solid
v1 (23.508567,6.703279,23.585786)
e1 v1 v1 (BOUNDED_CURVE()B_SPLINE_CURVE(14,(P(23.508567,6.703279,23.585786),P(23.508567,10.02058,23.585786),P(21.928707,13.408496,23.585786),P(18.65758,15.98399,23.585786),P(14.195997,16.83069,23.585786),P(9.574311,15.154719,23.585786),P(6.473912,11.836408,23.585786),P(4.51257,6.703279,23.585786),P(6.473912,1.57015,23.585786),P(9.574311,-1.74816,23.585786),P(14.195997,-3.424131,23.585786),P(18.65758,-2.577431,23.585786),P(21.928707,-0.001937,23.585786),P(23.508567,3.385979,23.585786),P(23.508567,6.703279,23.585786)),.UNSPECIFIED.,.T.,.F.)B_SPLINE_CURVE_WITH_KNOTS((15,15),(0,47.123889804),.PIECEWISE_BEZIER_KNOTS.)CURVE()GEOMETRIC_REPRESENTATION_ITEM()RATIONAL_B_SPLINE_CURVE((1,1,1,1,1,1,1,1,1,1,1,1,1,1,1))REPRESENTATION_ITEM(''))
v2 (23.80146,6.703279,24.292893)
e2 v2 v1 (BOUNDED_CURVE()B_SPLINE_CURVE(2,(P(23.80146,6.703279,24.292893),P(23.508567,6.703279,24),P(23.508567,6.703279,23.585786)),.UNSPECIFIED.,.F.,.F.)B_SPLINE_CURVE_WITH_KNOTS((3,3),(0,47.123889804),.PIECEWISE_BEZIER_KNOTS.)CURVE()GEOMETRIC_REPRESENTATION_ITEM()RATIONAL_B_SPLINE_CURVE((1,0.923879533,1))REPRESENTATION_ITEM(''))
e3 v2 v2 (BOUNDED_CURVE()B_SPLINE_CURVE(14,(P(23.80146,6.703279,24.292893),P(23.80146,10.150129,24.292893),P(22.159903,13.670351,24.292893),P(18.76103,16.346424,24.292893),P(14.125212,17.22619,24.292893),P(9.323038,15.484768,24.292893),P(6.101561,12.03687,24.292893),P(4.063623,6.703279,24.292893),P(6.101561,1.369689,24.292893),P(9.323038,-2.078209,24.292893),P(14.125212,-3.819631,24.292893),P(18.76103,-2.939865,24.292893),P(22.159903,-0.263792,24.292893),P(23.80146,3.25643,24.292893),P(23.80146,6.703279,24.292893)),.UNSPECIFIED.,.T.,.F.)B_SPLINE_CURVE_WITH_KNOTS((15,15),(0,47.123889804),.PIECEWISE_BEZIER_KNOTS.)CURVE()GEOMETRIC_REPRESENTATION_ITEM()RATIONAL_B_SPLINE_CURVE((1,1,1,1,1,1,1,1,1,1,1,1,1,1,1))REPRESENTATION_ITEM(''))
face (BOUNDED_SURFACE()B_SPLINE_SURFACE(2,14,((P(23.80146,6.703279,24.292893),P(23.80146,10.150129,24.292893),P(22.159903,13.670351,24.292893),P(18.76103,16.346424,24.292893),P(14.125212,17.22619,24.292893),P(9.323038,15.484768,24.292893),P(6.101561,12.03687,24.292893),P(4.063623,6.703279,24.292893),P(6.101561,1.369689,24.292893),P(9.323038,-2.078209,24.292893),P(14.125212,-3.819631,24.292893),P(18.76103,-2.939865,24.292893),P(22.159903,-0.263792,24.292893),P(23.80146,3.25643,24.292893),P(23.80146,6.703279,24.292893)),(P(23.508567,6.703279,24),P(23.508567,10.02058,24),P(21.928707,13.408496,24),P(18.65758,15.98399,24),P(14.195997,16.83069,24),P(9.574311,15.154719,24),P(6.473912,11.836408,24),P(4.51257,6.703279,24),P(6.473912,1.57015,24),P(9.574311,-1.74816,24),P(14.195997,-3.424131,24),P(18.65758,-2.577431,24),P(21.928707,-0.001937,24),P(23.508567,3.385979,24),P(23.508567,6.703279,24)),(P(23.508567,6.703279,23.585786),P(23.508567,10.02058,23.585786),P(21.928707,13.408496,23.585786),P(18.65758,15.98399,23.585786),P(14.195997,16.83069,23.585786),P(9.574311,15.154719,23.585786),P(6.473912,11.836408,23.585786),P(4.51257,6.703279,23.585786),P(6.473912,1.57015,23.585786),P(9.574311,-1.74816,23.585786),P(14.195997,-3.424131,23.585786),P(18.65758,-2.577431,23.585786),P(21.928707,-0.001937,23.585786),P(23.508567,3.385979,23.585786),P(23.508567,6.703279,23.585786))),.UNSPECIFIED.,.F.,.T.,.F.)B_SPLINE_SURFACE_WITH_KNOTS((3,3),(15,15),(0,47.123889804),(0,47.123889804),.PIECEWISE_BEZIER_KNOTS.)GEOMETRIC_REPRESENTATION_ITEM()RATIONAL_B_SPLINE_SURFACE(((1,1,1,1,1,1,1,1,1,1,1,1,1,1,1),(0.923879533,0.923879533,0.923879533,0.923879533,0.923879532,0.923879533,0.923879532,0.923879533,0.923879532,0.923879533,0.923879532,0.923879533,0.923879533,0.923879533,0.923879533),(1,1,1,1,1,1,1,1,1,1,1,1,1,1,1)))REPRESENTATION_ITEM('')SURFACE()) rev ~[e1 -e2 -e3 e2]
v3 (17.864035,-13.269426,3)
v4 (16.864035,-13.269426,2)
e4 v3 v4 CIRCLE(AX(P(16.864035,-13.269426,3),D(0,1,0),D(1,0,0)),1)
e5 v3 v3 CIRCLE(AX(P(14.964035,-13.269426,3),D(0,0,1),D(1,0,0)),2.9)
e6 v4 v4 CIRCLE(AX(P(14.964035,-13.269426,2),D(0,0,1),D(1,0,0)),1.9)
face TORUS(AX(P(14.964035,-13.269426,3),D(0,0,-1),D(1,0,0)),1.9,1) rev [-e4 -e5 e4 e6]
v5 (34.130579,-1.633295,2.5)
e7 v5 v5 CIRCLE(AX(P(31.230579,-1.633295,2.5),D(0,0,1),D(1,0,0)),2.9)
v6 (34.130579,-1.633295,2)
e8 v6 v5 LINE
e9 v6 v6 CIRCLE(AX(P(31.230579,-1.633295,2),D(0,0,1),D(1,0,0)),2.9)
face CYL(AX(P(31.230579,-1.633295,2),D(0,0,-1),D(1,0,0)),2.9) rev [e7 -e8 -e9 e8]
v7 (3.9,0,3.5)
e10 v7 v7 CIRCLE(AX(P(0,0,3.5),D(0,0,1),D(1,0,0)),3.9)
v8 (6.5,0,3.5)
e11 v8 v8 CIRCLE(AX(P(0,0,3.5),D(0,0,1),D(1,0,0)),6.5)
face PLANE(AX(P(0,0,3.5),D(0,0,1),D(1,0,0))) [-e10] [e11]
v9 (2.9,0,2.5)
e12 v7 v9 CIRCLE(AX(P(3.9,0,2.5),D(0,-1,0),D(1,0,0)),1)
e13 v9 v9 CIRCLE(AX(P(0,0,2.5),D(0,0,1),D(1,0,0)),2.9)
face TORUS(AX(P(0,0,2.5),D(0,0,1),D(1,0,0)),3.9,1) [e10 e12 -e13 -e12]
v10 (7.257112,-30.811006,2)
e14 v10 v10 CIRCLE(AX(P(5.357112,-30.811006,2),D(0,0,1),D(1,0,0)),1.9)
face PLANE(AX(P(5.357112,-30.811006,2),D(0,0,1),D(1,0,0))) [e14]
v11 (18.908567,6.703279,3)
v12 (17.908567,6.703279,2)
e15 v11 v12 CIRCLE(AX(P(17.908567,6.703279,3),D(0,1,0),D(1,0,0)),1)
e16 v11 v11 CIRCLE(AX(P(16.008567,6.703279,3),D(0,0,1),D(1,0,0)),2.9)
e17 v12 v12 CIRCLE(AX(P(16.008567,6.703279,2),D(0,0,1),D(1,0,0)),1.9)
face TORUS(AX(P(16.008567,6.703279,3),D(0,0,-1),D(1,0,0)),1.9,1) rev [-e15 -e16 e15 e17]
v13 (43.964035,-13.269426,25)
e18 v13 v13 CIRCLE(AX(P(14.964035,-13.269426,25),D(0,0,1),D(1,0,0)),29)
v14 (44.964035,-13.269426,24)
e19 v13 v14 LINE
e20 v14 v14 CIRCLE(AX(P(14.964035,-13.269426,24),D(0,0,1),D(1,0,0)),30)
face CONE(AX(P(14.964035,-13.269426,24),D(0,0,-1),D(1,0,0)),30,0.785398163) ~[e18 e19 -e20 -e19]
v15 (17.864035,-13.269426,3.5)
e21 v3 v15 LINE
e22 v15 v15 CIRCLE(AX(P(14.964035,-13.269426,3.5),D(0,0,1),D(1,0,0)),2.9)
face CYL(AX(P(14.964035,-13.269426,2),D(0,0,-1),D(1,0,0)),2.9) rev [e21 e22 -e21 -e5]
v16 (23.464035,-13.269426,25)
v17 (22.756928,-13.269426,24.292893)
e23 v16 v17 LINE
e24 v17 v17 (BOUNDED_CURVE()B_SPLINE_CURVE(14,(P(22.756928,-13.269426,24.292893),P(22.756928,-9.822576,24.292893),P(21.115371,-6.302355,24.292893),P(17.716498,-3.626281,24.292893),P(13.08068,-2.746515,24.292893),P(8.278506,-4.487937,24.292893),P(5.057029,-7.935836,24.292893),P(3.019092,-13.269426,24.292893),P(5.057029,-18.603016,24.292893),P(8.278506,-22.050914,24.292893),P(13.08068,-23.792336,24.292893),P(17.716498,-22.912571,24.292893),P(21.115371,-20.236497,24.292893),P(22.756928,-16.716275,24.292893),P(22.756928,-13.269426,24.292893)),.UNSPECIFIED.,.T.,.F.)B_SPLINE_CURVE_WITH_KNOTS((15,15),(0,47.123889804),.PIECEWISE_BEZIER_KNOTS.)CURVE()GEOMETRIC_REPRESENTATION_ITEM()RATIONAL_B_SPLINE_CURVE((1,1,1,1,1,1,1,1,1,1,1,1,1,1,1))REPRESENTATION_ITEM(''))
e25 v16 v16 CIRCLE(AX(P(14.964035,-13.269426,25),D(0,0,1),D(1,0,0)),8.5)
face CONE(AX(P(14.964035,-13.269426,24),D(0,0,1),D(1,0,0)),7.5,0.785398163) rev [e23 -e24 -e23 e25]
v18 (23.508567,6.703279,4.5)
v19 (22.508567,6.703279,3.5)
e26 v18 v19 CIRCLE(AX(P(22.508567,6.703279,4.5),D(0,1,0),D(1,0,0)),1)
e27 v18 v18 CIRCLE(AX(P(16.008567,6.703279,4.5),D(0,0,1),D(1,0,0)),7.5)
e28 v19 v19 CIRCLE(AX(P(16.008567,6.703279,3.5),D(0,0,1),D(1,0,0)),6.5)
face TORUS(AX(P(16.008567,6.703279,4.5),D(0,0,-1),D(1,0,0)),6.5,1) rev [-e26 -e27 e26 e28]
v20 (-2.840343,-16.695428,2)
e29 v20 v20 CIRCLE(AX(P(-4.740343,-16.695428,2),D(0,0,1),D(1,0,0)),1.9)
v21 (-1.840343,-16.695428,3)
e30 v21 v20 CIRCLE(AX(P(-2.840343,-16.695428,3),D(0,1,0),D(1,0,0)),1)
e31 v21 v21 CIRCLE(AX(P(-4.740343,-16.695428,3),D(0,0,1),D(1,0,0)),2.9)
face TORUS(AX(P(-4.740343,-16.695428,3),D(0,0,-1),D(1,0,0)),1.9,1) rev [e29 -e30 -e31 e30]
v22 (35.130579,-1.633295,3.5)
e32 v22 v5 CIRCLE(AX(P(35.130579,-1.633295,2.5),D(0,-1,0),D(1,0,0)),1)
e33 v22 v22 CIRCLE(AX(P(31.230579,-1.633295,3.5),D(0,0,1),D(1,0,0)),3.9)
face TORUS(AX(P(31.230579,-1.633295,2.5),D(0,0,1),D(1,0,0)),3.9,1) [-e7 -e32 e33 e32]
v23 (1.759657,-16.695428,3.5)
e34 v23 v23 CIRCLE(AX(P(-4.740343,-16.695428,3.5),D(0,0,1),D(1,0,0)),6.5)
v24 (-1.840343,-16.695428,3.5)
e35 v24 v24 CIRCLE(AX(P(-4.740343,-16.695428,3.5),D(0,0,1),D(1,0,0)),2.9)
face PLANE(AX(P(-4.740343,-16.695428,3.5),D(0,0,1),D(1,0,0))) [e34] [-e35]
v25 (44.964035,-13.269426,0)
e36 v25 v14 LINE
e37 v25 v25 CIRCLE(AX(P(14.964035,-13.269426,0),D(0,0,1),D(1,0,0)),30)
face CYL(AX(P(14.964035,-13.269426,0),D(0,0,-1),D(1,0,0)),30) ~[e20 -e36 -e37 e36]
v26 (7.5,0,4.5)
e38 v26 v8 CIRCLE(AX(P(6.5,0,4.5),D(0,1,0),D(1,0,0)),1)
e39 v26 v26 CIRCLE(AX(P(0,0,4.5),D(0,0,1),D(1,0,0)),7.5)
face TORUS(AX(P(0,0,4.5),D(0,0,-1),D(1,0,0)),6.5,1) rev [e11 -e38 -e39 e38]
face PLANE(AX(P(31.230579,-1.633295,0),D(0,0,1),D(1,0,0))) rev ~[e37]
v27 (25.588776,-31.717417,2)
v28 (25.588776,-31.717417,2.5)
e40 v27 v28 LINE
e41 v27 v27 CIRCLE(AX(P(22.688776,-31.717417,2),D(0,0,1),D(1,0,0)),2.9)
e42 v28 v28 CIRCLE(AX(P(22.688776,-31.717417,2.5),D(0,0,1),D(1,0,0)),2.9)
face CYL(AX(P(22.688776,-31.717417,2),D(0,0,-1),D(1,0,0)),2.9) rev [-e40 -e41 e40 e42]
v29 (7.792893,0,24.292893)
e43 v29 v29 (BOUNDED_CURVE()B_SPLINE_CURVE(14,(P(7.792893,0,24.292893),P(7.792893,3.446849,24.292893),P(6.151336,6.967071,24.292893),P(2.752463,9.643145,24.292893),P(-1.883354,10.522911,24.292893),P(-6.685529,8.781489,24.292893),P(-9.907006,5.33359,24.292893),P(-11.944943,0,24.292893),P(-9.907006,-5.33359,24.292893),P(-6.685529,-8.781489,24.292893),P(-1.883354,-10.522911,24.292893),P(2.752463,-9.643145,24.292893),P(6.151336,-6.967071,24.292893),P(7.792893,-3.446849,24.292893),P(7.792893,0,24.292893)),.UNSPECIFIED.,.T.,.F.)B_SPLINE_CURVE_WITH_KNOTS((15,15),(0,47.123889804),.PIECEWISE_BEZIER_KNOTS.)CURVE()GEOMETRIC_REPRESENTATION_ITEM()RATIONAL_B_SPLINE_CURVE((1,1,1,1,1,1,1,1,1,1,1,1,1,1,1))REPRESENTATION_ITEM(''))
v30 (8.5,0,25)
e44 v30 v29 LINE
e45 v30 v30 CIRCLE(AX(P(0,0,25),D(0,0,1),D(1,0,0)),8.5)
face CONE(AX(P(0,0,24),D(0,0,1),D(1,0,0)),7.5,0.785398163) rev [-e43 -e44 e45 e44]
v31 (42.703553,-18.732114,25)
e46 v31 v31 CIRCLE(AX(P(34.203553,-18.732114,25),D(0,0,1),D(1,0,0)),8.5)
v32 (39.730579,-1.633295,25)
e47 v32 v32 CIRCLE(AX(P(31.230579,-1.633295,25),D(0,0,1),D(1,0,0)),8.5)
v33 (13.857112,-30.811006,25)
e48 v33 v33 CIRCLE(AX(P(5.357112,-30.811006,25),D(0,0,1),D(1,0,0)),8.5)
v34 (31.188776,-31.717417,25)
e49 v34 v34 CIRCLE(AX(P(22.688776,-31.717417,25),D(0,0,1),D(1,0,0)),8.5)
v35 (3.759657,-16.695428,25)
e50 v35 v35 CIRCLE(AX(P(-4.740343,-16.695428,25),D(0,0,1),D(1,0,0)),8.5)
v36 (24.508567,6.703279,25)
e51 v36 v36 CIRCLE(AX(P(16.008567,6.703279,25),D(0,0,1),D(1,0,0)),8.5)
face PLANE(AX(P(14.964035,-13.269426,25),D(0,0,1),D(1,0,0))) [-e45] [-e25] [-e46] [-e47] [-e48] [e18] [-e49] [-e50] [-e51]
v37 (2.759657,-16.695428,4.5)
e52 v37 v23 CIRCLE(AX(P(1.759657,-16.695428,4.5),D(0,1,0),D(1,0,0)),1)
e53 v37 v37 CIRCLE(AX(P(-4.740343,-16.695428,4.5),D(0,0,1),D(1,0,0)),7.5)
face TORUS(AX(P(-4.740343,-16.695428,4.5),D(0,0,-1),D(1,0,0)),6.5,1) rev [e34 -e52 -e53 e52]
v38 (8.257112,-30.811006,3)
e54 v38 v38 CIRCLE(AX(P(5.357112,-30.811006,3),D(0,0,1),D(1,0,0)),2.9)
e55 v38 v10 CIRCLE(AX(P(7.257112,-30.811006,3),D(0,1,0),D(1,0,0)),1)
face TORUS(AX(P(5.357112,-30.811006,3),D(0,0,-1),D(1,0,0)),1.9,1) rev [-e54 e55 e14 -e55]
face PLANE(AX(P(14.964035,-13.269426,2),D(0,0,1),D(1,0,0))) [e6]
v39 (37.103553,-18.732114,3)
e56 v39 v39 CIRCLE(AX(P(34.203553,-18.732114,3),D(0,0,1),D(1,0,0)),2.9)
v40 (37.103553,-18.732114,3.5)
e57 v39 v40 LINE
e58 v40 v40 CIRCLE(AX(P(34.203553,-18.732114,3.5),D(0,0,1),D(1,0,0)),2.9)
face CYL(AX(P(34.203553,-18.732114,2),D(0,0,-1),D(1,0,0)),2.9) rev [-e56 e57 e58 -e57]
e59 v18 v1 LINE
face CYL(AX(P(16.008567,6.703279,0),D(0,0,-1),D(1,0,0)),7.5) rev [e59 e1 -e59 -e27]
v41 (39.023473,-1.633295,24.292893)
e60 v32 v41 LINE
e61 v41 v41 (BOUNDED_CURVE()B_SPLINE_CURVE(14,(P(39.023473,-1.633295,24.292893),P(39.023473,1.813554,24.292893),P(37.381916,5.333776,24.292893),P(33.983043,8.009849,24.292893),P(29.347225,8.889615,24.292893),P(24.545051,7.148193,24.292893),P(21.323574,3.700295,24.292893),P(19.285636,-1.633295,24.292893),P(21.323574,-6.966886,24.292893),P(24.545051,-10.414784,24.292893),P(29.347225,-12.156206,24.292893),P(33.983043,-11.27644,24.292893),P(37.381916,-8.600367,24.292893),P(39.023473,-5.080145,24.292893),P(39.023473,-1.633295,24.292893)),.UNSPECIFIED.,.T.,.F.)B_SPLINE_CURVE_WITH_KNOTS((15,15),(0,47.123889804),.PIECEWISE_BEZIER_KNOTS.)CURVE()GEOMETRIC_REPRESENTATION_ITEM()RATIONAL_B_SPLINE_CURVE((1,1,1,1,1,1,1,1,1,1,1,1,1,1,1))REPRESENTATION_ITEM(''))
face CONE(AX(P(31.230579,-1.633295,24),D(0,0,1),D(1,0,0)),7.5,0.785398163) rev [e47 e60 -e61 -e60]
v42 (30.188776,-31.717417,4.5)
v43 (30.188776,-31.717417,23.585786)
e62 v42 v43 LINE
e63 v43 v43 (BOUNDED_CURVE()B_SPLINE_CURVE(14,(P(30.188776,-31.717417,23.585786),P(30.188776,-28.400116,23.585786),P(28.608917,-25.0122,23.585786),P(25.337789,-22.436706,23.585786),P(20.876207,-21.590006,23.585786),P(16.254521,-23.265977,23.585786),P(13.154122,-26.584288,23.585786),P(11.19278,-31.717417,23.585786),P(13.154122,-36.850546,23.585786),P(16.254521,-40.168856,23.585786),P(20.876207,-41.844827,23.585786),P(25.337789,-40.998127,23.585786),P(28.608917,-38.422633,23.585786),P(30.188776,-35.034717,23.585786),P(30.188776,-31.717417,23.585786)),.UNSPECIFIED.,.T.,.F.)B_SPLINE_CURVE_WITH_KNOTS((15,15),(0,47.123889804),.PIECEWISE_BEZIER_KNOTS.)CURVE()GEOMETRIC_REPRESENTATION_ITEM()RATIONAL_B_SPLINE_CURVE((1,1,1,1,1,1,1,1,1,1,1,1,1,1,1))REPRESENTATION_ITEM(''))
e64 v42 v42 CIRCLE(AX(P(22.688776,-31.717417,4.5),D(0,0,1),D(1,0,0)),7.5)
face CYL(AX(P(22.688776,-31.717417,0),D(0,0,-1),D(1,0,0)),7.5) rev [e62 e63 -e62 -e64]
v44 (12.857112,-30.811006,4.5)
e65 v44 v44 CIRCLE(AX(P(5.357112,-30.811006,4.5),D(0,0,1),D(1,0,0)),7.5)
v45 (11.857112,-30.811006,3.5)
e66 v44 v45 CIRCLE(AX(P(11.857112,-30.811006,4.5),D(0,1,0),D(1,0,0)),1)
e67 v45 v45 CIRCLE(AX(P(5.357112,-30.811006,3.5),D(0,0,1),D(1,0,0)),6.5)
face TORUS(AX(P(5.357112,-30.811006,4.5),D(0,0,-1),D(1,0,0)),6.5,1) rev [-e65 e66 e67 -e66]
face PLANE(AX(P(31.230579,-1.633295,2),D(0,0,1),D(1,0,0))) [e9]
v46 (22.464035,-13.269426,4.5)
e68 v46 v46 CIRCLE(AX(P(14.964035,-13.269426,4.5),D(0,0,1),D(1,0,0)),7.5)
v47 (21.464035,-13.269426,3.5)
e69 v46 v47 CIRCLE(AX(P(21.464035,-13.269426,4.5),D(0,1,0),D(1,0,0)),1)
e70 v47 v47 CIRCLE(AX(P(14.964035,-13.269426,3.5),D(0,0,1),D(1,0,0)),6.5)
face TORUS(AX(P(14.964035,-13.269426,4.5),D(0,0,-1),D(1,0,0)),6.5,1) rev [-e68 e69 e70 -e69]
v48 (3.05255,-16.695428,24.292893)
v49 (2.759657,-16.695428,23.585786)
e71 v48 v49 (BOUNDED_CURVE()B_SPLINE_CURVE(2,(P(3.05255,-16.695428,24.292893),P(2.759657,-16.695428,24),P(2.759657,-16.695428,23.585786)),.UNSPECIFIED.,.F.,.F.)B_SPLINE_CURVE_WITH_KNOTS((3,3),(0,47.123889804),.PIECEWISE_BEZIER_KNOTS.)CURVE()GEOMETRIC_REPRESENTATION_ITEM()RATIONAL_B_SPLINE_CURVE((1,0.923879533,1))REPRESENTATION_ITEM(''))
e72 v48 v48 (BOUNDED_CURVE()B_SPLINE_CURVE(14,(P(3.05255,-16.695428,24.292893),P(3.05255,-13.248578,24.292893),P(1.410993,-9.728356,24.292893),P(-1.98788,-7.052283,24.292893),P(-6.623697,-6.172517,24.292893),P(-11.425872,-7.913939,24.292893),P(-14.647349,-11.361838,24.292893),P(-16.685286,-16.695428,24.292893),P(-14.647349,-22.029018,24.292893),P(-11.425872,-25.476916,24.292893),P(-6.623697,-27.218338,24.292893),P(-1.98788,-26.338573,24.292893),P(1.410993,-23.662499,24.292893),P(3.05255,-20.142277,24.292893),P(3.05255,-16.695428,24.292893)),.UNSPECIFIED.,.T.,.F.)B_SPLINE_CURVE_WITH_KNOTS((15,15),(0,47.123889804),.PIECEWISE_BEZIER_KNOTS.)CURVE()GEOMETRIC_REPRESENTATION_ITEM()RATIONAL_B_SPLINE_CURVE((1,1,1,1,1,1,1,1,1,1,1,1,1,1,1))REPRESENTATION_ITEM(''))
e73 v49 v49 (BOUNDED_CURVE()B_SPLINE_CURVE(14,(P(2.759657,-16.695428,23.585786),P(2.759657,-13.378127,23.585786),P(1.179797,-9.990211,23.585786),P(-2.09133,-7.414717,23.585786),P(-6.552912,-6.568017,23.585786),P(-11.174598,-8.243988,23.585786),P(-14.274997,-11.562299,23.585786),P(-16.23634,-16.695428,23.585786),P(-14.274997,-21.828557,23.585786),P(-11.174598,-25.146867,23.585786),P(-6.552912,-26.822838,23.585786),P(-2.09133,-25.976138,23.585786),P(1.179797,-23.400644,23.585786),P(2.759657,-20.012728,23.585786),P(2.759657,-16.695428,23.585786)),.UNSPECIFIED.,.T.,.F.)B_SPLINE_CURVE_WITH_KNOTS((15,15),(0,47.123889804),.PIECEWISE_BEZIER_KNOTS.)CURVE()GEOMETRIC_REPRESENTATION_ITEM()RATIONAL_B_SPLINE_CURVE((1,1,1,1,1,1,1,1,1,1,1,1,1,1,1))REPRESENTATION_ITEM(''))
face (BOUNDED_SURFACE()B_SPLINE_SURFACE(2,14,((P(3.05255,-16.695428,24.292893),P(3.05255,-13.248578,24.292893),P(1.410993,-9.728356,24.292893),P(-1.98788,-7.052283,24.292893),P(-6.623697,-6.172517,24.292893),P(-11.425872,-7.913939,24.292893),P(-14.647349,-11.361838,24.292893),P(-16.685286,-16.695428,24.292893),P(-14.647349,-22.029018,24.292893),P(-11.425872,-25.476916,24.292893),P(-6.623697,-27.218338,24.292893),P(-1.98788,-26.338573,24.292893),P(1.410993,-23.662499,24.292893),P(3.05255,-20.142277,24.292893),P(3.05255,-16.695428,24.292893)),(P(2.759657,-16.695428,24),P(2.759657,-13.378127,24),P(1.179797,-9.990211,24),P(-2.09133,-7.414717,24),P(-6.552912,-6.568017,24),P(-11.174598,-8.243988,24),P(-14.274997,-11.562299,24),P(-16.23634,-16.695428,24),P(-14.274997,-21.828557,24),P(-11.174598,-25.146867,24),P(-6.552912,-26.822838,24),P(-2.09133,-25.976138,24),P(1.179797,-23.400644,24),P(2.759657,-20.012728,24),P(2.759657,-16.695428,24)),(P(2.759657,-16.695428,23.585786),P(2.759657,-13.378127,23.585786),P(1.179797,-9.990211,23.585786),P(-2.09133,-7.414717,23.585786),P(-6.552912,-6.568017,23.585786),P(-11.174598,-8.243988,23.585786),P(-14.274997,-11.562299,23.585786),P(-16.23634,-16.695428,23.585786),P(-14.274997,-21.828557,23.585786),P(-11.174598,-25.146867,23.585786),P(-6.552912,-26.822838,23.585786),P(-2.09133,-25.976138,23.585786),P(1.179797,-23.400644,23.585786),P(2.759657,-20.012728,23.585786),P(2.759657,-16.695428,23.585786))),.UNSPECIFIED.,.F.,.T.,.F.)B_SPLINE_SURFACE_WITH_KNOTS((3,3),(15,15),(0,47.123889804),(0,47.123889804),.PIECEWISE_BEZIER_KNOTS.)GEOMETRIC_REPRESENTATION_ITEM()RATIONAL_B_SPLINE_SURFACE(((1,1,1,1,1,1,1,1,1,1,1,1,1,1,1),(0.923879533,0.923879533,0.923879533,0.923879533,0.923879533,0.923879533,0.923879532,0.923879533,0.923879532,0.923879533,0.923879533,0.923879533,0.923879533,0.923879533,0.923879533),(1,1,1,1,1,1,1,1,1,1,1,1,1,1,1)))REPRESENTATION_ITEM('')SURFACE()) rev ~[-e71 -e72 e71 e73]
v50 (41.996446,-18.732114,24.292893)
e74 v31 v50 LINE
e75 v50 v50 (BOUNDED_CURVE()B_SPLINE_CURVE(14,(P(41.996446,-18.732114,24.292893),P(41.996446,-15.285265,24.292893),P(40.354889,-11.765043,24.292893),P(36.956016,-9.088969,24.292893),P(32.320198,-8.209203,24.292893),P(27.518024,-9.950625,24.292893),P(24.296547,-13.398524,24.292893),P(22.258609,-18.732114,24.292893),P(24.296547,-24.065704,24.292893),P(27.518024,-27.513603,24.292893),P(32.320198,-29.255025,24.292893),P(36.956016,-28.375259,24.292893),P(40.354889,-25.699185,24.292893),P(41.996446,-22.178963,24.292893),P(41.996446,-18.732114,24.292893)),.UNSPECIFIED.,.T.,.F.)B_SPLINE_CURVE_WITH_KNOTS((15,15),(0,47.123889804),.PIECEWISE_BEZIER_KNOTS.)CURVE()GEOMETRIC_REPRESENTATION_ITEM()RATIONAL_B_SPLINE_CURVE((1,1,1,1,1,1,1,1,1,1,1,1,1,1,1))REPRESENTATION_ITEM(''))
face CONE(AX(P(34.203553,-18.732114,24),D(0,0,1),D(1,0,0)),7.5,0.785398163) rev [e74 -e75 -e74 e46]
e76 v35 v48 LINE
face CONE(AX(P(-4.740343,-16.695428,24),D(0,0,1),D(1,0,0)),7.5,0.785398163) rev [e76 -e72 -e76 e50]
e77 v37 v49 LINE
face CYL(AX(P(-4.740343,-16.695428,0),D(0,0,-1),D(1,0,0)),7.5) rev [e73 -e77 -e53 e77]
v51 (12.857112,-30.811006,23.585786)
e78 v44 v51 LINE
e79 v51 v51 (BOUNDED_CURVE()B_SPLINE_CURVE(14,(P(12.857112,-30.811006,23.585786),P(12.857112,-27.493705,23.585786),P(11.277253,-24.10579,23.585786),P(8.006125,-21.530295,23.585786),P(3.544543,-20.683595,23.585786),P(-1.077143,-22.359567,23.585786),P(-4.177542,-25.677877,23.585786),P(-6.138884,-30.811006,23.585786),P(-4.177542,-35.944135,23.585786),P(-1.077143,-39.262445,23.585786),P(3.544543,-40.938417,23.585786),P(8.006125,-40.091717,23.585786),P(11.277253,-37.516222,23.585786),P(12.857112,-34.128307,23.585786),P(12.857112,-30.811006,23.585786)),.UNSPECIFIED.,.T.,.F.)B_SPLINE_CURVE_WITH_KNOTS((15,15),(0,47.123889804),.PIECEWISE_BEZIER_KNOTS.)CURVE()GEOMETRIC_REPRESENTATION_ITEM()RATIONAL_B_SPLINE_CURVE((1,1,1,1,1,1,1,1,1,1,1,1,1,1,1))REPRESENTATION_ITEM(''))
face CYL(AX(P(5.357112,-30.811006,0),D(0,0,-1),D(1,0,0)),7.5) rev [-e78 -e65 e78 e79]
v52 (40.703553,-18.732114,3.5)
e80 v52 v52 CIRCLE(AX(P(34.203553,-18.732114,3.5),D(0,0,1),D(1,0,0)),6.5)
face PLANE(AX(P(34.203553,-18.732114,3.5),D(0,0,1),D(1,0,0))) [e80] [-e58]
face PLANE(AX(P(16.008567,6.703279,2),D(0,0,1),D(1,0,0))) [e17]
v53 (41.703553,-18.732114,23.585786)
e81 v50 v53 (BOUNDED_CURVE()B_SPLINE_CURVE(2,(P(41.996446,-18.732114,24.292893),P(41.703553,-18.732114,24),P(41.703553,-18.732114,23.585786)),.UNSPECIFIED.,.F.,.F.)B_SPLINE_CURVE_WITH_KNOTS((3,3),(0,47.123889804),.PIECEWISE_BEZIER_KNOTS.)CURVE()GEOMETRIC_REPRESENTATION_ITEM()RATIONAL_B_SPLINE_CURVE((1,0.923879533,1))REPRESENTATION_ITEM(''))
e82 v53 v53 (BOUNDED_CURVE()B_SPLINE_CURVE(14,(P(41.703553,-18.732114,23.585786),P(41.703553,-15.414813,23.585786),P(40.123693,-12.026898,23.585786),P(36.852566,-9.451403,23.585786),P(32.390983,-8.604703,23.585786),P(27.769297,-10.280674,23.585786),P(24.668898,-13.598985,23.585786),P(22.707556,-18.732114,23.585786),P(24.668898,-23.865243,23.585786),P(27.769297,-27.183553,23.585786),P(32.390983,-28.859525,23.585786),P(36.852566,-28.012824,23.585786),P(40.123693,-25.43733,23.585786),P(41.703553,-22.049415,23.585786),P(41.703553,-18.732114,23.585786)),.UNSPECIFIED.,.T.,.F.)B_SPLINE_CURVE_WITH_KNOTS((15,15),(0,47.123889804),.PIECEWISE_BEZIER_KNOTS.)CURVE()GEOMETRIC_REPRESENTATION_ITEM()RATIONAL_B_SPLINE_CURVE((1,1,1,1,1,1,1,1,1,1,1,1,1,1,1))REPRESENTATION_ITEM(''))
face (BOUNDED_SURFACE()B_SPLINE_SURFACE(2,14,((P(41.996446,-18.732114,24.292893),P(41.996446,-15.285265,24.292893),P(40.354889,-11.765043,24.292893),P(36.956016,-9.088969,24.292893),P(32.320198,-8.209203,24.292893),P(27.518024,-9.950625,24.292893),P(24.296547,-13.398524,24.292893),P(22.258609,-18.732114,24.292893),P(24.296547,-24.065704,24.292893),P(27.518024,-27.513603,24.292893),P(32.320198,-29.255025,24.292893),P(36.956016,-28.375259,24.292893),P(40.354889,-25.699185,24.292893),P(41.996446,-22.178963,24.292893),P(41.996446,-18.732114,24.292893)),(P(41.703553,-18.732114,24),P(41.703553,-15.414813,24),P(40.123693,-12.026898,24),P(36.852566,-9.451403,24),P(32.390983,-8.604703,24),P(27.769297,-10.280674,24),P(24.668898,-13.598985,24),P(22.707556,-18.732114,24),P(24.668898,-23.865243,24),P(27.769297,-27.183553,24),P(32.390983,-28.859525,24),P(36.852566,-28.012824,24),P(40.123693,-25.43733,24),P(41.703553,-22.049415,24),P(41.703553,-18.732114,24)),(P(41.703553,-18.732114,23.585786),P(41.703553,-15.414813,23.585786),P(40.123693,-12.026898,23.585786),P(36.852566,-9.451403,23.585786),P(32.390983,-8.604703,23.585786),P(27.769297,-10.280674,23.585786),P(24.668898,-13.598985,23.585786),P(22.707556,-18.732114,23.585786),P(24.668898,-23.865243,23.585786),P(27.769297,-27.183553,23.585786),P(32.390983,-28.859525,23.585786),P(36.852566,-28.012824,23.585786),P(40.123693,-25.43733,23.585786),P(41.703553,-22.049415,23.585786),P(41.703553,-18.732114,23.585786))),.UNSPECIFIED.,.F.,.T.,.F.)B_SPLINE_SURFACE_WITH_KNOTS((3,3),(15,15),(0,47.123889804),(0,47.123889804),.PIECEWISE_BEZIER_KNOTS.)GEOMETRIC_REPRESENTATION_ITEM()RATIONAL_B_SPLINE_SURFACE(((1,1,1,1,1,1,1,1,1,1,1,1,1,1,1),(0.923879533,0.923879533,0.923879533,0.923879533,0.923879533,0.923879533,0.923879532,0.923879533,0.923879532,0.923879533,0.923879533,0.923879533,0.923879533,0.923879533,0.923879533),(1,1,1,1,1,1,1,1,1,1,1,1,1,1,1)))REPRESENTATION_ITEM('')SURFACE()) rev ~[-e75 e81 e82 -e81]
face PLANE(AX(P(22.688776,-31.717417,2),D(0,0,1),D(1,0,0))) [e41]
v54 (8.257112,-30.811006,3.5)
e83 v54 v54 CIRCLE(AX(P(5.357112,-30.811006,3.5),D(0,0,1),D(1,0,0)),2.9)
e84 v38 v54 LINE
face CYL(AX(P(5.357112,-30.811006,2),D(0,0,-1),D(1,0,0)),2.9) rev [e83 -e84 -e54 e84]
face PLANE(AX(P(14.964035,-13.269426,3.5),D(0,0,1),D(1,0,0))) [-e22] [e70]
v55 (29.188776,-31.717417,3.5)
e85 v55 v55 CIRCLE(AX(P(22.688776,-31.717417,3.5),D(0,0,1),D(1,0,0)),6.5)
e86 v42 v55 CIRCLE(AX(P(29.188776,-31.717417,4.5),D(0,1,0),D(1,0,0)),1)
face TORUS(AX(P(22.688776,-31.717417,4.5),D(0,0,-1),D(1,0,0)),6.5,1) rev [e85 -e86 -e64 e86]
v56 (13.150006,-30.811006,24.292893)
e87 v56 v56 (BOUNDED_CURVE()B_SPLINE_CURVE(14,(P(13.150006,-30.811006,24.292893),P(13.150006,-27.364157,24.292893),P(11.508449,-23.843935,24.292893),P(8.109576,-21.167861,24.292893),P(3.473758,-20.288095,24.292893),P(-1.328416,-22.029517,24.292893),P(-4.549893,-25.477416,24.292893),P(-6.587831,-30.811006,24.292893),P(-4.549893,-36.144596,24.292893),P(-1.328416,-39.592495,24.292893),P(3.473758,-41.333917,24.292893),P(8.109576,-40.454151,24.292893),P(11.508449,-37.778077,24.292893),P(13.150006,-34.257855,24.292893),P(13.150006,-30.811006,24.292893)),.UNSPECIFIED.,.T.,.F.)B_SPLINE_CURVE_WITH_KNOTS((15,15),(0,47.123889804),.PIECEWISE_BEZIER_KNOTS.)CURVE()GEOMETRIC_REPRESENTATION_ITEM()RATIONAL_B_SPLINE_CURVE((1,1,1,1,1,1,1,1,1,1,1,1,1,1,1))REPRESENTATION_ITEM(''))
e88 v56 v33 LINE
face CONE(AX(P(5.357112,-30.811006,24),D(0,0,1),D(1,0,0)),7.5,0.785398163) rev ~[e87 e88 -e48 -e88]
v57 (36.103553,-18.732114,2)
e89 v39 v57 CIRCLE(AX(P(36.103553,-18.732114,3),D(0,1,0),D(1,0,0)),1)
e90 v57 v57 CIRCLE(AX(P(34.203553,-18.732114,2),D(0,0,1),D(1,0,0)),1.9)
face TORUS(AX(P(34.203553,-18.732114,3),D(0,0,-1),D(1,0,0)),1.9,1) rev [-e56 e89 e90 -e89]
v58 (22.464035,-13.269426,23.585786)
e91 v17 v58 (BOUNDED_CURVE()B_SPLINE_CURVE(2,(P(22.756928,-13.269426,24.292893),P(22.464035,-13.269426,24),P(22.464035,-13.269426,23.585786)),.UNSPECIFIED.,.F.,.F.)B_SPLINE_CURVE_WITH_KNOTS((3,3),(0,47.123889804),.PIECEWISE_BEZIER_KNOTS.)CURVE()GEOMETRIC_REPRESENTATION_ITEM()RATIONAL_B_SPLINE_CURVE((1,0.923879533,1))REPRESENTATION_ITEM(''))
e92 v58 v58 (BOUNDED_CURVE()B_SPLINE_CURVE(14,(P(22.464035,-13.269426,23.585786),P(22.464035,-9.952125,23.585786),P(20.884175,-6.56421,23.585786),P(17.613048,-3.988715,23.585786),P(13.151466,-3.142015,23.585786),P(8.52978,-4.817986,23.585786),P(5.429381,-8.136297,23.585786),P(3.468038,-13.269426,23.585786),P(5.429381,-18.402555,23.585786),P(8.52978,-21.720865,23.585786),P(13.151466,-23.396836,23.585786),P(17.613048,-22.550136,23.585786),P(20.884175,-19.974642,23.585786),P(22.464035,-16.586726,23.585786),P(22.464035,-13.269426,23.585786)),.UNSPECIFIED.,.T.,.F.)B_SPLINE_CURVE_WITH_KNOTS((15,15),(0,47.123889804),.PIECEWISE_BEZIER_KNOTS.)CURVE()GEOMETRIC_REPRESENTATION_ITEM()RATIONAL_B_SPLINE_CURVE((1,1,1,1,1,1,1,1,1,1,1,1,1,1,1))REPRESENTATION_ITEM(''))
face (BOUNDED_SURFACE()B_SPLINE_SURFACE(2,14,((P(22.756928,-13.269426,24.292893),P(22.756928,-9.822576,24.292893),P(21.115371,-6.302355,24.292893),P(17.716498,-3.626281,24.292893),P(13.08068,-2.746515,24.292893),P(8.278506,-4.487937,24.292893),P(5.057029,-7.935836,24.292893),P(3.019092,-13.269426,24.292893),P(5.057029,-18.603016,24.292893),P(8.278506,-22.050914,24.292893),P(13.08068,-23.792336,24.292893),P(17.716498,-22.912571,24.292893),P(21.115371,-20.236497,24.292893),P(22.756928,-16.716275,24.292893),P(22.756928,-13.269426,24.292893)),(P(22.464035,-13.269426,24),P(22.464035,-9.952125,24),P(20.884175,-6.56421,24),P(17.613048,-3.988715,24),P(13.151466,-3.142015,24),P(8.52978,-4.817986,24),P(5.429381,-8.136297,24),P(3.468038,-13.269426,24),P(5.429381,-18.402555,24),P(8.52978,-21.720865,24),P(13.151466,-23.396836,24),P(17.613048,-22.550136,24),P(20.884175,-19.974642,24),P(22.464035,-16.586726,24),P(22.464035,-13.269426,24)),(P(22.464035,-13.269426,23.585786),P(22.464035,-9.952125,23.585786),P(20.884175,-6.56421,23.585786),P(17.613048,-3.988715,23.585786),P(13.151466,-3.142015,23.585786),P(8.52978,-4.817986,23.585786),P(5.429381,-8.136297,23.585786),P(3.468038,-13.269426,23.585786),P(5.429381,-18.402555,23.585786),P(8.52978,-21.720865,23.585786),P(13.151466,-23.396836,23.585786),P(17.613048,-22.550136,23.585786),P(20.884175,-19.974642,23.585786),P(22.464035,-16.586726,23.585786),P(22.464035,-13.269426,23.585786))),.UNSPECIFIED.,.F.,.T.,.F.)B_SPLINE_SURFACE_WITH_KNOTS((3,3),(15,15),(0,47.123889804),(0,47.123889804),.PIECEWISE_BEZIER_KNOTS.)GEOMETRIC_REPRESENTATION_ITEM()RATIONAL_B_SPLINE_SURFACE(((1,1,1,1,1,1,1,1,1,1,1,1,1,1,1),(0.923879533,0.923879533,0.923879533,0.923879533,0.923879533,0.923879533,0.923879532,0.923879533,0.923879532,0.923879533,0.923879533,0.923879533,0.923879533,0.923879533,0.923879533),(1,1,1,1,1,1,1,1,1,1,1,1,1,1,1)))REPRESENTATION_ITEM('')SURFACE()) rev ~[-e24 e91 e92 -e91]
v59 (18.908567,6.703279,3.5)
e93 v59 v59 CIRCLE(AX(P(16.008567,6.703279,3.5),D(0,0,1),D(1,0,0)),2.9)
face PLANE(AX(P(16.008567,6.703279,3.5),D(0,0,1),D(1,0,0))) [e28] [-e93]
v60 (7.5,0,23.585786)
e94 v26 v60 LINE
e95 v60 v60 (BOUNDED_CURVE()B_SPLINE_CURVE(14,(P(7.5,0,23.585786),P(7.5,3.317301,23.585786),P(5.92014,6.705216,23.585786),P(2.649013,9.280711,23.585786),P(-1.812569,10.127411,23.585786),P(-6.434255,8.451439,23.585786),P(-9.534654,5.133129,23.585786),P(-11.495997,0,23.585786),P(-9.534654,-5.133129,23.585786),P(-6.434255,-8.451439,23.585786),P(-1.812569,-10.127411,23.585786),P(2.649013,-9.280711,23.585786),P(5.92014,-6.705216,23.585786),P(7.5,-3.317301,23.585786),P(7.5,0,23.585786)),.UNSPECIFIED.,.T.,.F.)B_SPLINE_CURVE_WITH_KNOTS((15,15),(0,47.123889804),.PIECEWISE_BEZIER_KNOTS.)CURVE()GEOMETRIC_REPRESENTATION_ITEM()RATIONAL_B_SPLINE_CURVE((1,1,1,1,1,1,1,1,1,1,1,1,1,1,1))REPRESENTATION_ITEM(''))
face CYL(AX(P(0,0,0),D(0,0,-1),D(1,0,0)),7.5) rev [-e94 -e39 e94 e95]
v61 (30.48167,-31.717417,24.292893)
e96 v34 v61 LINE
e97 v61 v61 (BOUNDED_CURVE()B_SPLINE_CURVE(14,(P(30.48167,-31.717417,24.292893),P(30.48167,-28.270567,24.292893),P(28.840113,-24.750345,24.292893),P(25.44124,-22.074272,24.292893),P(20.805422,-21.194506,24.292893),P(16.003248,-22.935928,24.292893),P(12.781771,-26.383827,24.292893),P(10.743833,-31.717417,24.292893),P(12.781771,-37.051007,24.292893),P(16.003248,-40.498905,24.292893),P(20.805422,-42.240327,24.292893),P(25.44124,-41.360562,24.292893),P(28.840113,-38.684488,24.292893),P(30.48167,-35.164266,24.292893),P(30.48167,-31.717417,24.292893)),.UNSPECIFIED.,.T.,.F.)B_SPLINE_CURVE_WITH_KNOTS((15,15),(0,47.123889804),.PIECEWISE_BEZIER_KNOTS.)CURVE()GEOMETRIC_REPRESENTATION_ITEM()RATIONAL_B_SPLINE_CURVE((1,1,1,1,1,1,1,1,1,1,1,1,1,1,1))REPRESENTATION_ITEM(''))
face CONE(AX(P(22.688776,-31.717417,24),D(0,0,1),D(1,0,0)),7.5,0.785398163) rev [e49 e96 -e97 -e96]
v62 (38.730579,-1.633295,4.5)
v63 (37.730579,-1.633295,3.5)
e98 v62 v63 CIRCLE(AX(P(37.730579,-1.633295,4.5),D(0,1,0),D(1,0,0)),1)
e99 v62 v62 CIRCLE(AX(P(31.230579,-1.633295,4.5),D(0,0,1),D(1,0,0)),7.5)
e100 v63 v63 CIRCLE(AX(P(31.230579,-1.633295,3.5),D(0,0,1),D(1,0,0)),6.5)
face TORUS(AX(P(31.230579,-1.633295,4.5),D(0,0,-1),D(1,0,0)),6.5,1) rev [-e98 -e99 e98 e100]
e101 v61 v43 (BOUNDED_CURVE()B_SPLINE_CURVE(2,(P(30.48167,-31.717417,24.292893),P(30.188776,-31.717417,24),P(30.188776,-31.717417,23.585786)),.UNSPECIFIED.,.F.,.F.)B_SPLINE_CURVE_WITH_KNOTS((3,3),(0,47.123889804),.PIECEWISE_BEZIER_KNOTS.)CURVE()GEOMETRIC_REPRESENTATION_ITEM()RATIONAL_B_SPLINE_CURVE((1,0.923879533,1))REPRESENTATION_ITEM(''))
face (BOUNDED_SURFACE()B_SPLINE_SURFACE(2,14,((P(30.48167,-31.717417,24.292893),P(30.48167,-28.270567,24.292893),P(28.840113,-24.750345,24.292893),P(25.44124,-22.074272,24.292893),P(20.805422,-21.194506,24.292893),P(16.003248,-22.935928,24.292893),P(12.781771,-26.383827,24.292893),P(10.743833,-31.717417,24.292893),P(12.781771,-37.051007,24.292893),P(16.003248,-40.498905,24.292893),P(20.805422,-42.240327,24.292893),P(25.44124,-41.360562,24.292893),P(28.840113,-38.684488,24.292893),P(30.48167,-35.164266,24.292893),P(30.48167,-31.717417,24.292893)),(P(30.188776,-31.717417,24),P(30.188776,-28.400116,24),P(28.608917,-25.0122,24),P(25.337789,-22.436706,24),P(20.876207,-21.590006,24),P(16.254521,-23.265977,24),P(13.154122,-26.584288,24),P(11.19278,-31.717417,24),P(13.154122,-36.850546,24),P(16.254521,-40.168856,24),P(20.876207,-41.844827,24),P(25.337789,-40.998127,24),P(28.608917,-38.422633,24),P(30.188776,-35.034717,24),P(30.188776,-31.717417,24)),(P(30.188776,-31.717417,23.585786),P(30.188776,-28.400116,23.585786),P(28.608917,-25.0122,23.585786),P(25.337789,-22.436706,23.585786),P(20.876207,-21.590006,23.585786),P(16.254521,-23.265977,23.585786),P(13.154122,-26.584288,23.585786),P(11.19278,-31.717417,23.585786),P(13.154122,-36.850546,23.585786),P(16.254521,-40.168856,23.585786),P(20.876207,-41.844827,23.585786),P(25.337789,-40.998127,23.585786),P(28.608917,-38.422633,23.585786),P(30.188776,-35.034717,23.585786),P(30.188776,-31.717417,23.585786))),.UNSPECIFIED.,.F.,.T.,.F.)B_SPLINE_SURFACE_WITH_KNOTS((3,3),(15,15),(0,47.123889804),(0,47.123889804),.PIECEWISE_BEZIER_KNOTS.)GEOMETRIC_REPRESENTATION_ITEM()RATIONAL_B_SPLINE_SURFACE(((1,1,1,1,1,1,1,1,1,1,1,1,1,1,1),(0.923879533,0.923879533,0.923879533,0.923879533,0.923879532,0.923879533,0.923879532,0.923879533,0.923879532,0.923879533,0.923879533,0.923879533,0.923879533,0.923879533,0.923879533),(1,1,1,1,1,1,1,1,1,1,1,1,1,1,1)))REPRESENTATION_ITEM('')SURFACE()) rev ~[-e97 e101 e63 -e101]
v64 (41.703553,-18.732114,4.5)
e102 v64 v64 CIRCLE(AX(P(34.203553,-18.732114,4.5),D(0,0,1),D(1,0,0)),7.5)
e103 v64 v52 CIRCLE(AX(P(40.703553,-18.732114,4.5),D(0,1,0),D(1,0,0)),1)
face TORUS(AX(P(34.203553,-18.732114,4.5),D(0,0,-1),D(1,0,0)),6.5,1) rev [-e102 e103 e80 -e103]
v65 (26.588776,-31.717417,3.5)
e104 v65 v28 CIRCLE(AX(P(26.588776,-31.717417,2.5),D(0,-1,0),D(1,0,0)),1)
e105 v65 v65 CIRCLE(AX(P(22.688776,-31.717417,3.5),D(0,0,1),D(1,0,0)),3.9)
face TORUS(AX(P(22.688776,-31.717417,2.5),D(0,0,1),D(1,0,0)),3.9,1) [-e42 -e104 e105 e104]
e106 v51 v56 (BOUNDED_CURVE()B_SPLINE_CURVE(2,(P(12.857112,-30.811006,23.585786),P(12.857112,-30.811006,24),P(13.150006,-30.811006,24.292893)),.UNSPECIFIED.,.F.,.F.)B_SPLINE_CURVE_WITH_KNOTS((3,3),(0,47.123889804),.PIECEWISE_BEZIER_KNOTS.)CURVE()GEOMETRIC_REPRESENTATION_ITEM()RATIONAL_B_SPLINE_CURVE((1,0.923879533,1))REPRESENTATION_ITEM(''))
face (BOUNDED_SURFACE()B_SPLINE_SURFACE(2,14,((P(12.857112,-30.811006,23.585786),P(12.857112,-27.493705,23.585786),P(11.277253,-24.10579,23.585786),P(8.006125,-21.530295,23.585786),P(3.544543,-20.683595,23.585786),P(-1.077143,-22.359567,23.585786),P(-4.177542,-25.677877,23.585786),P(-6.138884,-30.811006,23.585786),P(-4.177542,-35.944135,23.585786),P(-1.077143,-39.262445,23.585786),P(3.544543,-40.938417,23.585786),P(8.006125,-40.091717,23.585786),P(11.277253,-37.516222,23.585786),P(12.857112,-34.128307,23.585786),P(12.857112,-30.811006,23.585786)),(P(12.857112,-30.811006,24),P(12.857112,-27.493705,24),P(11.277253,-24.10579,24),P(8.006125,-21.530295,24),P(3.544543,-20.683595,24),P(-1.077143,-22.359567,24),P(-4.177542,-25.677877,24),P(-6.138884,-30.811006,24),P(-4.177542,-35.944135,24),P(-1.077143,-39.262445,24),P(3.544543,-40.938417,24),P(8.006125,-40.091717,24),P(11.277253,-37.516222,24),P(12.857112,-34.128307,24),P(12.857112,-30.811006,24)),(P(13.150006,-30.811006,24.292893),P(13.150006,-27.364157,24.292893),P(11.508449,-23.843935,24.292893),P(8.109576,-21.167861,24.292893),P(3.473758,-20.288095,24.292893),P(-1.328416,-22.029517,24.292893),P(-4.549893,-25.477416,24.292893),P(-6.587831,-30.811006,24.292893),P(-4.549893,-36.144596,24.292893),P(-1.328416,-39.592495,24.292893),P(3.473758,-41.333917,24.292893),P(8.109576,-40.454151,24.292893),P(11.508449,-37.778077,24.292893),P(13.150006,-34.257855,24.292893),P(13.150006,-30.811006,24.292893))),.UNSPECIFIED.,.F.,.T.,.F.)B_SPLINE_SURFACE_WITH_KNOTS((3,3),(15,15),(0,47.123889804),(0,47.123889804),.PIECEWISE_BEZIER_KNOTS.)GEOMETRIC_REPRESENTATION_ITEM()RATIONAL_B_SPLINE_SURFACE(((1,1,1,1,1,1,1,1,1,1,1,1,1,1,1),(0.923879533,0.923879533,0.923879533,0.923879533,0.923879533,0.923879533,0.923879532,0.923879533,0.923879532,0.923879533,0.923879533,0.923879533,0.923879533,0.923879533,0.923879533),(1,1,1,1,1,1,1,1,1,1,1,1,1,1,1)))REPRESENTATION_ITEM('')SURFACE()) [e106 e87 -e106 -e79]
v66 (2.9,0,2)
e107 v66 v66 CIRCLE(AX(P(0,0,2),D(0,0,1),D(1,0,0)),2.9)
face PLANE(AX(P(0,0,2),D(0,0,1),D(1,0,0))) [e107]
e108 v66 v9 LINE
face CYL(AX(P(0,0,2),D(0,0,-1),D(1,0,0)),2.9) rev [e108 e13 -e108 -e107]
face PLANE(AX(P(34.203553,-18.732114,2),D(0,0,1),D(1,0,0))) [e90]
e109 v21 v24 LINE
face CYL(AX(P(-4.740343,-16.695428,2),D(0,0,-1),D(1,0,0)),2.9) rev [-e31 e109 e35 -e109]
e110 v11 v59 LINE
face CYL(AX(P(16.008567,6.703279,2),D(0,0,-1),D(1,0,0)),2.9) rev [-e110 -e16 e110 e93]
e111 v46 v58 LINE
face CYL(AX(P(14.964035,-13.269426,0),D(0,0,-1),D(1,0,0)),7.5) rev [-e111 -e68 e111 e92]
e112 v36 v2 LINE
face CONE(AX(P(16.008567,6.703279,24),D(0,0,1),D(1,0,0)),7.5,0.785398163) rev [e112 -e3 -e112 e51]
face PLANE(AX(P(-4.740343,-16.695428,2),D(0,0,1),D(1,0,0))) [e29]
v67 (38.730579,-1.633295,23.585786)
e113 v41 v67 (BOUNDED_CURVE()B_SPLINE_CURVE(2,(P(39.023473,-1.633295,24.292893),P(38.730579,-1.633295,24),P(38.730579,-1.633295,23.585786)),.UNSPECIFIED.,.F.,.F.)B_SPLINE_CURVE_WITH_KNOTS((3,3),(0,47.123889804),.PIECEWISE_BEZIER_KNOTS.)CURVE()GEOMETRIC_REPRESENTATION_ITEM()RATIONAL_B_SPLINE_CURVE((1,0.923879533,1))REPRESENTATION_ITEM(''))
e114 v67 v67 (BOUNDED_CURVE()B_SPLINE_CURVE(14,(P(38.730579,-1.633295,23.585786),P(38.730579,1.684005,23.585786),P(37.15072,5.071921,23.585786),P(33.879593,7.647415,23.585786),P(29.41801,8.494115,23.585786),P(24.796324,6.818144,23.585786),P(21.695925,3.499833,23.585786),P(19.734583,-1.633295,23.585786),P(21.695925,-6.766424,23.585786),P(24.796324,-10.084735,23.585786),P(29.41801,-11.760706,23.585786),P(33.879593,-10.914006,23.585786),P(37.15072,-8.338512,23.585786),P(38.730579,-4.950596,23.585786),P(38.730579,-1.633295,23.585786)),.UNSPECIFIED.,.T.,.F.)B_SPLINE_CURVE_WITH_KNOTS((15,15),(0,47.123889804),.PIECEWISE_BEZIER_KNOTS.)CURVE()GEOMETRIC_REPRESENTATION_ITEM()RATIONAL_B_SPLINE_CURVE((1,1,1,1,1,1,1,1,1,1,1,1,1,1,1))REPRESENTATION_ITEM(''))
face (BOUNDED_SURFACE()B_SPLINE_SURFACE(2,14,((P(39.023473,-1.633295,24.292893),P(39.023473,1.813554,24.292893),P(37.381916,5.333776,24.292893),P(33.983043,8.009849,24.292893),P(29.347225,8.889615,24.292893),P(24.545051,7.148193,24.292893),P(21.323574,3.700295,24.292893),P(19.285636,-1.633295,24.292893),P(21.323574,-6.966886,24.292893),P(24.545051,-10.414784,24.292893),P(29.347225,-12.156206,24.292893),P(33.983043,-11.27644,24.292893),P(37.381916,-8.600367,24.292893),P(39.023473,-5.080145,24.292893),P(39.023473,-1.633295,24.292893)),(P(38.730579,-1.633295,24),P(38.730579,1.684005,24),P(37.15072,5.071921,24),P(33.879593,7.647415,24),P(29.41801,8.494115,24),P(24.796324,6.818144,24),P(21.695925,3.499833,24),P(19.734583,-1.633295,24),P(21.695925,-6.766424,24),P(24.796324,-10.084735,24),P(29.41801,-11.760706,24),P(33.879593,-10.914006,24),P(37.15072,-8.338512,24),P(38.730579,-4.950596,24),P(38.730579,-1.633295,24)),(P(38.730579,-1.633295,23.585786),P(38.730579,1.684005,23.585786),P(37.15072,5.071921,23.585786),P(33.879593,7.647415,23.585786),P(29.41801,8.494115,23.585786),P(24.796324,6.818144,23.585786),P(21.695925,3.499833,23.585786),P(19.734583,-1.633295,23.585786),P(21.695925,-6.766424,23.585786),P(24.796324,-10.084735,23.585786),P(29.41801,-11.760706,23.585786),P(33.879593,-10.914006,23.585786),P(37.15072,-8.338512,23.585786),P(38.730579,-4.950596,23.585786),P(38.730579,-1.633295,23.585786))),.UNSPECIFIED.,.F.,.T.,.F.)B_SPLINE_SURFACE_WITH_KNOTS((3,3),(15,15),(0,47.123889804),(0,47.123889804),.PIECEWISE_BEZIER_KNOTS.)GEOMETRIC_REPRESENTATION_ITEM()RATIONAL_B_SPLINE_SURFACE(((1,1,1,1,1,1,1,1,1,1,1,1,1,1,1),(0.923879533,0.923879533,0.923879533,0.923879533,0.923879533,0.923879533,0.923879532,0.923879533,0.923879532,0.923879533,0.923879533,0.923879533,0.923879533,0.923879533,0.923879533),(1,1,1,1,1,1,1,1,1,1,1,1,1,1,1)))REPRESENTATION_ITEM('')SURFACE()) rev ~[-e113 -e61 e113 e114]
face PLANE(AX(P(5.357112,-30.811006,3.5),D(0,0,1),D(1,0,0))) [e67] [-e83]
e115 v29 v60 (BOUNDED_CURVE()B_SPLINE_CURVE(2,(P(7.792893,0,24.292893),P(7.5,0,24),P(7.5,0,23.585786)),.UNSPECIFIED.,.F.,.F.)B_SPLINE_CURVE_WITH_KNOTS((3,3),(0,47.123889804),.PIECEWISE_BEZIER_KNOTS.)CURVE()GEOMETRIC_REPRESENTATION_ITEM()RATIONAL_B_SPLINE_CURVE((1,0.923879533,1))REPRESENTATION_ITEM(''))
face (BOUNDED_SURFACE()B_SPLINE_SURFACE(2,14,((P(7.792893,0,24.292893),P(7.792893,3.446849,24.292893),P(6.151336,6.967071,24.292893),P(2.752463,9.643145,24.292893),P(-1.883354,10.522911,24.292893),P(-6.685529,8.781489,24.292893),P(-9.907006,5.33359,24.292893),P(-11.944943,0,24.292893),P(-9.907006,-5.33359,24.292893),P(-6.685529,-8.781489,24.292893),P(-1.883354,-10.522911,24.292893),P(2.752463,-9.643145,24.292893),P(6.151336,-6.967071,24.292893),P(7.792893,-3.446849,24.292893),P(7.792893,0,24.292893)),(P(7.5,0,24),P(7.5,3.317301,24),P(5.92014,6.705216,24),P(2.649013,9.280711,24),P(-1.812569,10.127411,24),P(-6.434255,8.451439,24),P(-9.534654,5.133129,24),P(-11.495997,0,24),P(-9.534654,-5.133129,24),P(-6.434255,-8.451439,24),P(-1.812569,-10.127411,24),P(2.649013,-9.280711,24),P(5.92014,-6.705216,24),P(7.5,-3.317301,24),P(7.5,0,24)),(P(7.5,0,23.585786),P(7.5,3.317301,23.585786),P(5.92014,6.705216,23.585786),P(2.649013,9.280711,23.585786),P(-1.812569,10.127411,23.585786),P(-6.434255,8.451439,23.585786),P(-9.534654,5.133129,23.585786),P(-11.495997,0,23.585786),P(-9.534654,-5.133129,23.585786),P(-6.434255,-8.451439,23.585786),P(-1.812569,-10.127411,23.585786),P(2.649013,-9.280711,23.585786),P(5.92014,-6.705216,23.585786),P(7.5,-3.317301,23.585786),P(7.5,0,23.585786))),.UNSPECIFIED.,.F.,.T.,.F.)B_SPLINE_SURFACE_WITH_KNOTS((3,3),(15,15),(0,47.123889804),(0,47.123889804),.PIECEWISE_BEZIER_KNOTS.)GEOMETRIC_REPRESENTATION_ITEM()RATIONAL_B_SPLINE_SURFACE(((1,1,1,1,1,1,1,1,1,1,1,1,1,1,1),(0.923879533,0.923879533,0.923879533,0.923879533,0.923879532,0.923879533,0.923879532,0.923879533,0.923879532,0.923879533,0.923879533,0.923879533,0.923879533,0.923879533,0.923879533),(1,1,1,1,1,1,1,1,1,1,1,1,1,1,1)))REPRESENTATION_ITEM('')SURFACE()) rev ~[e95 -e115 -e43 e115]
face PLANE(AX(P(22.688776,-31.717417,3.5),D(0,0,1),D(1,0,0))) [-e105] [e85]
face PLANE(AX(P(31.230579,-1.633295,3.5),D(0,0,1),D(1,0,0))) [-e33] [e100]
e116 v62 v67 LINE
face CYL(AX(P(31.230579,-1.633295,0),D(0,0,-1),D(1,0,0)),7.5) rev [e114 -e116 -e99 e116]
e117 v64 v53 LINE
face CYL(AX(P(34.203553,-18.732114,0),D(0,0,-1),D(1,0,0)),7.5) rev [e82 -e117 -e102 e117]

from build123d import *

# Parameters (mm, degrees)
F0_R     = 30
F0_R_2   = 7.5
F1_DEPTH = 25
F2_DEPTH = 2
F3_R     = 7.5
F3_R_2   = 2.9
F4_DEPTH = 1.5
F5_SIZE  = 1
F6_R     = 1


# Not quite as in the source:
# - a feature names something its author has since deleted; it is built from what else it names


with BuildPart() as f1:
    # F0 (on Top) → F1 (new body)
    with BuildSketch(Plane.XY):
        with Locations((14.9640348837, -13.26942576)):
            Circle(F0_R)
        with Locations((5.3571123497, -30.8110060601)):
            Circle(F0_R_2, mode=Mode.SUBTRACT)
        with Locations((-4.7403430744, -16.6954276989)):
            Circle(F0_R_2, mode=Mode.SUBTRACT)
        with Locations((22.6887763873, -31.7174166723)):
            Circle(F0_R_2, mode=Mode.SUBTRACT)
        with Locations((34.2035525167, -18.7321138571)):
            Circle(F0_R_2, mode=Mode.SUBTRACT)
        Circle(F0_R_2, mode=Mode.SUBTRACT)
        with Locations((14.9640348837, -13.26942576)):
            Circle(F0_R_2, mode=Mode.SUBTRACT)
        with Locations((31.2305794538, -1.6332954863)):
            Circle(F0_R_2, mode=Mode.SUBTRACT)
        with Locations((16.0085665525, 6.7032794547)):
            Circle(F0_R_2, mode=Mode.SUBTRACT)
    extrude(amount=F1_DEPTH)

    # F0 (on Top) → F2 (join)
    with BuildSketch(Plane.XY):
        with Locations((31.2305794538, -1.6332954863)):
            Circle(F0_R_2)
        with Locations((34.2035525167, -18.7321138571)):
            Circle(F0_R_2)
        with Locations((22.6887763873, -31.7174166723)):
            Circle(F0_R_2)
        with Locations((14.9640348837, -13.26942576)):
            Circle(F0_R_2)
        with Locations((16.0085665525, 6.7032794547)):
            Circle(F0_R_2)
        Circle(F0_R_2)
        with Locations((5.3571123497, -30.8110060601)):
            Circle(F0_R_2)
        with Locations((-4.7403430744, -16.6954276989)):
            Circle(F0_R_2)
    extrude(amount=F2_DEPTH)

    # F3 (on face) → F4 (join)
    with BuildSketch(Plane.XY.offset(2)):
        with Locations((5.3571123497, -30.8110060601)):
            Circle(F3_R)
        with Locations((5.3571123497, -30.8110060601)):
            Circle(F3_R_2, mode=Mode.SUBTRACT)
        with Locations((14.9640348837, -13.26942576)):
            Circle(F3_R)
        with Locations((14.9640348837, -13.26942576)):
            Circle(F3_R_2, mode=Mode.SUBTRACT)
        with Locations((22.6887763873, -31.7174166723)):
            Circle(F3_R)
        with Locations((22.6887763873, -31.7174166723)):
            Circle(F3_R_2, mode=Mode.SUBTRACT)
        with Locations((34.2035525167, -18.7321138571)):
            Circle(F3_R)
        with Locations((34.2035525167, -18.7321138571)):
            Circle(F3_R_2, mode=Mode.SUBTRACT)
        with Locations((31.2305794538, -1.6332954863)):
            Circle(F3_R)
        with Locations((31.2305794538, -1.6332954863)):
            Circle(F3_R_2, mode=Mode.SUBTRACT)
        with Locations((16.0085665525, 6.7032794547)):
            Circle(F3_R)
        with Locations((16.0085665525, 6.7032794547)):
            Circle(F3_R_2, mode=Mode.SUBTRACT)
        with Locations((-4.7403430744, -16.6954276989)):
            Circle(F3_R)
        with Locations((-4.7403430744, -16.6954276989)):
            Circle(F3_R_2, mode=Mode.SUBTRACT)
        Circle(F3_R)
        Circle(F3_R_2, mode=Mode.SUBTRACT)
    extrude(amount=F4_DEPTH)

    # F5
    f5_edges = [f1.edges().sort_by_distance(p)[0] for p in [
        (-12.240343, -16.695428, 25),
        (-7.5, 0, 25),
        (8.508567, 6.703279, 25),
        (23.730579, -1.633295, 25),
        (26.703553, -18.732114, 25),
        (7.464035, -13.269426, 25),
        (-2.142888, -30.811006, 25),
        (15.188776, -31.717417, 25),
        (-15.035965, -13.269426, 25),
    ]]
    chamfer(f5_edges, length=F5_SIZE)

    # F6
    f6_edges = [f1.edges().sort_by_distance(p)[0] for p in [
        (-2.142888, -30.811006, 24),
        (-12.240343, -16.695428, 24),
        (15.188776, -31.717417, 24),
        (26.703553, -18.732114, 24),
        (23.730579, -1.633295, 24),
        (8.508567, 6.703279, 24),
        (-7.5, 0, 24),
        (7.464035, -13.269426, 24),
        (2.457112, -30.811006, 2),
        (-7.640343, -16.695428, 2),
        (-2.9, 0, 3.5),
        (12.064035, -13.269426, 2),
        (19.788776, -31.717417, 3.5),
        (31.303553, -18.732114, 2),
        (28.330579, -1.633295, 3.5),
        (13.108567, 6.703279, 2),
        (8.508567, 6.703279, 3.5),
        (7.464035, -13.269426, 3.5),
        (-7.5, 0, 3.5),
        (-12.240343, -16.695428, 3.5),
        (-2.142888, -30.811006, 3.5),
        (15.188776, -31.717417, 3.5),
        (26.703553, -18.732114, 3.5),
        (23.730579, -1.633295, 3.5),
    ]]
    fillet(f6_edges, radius=F6_R)


solid = f1.part
